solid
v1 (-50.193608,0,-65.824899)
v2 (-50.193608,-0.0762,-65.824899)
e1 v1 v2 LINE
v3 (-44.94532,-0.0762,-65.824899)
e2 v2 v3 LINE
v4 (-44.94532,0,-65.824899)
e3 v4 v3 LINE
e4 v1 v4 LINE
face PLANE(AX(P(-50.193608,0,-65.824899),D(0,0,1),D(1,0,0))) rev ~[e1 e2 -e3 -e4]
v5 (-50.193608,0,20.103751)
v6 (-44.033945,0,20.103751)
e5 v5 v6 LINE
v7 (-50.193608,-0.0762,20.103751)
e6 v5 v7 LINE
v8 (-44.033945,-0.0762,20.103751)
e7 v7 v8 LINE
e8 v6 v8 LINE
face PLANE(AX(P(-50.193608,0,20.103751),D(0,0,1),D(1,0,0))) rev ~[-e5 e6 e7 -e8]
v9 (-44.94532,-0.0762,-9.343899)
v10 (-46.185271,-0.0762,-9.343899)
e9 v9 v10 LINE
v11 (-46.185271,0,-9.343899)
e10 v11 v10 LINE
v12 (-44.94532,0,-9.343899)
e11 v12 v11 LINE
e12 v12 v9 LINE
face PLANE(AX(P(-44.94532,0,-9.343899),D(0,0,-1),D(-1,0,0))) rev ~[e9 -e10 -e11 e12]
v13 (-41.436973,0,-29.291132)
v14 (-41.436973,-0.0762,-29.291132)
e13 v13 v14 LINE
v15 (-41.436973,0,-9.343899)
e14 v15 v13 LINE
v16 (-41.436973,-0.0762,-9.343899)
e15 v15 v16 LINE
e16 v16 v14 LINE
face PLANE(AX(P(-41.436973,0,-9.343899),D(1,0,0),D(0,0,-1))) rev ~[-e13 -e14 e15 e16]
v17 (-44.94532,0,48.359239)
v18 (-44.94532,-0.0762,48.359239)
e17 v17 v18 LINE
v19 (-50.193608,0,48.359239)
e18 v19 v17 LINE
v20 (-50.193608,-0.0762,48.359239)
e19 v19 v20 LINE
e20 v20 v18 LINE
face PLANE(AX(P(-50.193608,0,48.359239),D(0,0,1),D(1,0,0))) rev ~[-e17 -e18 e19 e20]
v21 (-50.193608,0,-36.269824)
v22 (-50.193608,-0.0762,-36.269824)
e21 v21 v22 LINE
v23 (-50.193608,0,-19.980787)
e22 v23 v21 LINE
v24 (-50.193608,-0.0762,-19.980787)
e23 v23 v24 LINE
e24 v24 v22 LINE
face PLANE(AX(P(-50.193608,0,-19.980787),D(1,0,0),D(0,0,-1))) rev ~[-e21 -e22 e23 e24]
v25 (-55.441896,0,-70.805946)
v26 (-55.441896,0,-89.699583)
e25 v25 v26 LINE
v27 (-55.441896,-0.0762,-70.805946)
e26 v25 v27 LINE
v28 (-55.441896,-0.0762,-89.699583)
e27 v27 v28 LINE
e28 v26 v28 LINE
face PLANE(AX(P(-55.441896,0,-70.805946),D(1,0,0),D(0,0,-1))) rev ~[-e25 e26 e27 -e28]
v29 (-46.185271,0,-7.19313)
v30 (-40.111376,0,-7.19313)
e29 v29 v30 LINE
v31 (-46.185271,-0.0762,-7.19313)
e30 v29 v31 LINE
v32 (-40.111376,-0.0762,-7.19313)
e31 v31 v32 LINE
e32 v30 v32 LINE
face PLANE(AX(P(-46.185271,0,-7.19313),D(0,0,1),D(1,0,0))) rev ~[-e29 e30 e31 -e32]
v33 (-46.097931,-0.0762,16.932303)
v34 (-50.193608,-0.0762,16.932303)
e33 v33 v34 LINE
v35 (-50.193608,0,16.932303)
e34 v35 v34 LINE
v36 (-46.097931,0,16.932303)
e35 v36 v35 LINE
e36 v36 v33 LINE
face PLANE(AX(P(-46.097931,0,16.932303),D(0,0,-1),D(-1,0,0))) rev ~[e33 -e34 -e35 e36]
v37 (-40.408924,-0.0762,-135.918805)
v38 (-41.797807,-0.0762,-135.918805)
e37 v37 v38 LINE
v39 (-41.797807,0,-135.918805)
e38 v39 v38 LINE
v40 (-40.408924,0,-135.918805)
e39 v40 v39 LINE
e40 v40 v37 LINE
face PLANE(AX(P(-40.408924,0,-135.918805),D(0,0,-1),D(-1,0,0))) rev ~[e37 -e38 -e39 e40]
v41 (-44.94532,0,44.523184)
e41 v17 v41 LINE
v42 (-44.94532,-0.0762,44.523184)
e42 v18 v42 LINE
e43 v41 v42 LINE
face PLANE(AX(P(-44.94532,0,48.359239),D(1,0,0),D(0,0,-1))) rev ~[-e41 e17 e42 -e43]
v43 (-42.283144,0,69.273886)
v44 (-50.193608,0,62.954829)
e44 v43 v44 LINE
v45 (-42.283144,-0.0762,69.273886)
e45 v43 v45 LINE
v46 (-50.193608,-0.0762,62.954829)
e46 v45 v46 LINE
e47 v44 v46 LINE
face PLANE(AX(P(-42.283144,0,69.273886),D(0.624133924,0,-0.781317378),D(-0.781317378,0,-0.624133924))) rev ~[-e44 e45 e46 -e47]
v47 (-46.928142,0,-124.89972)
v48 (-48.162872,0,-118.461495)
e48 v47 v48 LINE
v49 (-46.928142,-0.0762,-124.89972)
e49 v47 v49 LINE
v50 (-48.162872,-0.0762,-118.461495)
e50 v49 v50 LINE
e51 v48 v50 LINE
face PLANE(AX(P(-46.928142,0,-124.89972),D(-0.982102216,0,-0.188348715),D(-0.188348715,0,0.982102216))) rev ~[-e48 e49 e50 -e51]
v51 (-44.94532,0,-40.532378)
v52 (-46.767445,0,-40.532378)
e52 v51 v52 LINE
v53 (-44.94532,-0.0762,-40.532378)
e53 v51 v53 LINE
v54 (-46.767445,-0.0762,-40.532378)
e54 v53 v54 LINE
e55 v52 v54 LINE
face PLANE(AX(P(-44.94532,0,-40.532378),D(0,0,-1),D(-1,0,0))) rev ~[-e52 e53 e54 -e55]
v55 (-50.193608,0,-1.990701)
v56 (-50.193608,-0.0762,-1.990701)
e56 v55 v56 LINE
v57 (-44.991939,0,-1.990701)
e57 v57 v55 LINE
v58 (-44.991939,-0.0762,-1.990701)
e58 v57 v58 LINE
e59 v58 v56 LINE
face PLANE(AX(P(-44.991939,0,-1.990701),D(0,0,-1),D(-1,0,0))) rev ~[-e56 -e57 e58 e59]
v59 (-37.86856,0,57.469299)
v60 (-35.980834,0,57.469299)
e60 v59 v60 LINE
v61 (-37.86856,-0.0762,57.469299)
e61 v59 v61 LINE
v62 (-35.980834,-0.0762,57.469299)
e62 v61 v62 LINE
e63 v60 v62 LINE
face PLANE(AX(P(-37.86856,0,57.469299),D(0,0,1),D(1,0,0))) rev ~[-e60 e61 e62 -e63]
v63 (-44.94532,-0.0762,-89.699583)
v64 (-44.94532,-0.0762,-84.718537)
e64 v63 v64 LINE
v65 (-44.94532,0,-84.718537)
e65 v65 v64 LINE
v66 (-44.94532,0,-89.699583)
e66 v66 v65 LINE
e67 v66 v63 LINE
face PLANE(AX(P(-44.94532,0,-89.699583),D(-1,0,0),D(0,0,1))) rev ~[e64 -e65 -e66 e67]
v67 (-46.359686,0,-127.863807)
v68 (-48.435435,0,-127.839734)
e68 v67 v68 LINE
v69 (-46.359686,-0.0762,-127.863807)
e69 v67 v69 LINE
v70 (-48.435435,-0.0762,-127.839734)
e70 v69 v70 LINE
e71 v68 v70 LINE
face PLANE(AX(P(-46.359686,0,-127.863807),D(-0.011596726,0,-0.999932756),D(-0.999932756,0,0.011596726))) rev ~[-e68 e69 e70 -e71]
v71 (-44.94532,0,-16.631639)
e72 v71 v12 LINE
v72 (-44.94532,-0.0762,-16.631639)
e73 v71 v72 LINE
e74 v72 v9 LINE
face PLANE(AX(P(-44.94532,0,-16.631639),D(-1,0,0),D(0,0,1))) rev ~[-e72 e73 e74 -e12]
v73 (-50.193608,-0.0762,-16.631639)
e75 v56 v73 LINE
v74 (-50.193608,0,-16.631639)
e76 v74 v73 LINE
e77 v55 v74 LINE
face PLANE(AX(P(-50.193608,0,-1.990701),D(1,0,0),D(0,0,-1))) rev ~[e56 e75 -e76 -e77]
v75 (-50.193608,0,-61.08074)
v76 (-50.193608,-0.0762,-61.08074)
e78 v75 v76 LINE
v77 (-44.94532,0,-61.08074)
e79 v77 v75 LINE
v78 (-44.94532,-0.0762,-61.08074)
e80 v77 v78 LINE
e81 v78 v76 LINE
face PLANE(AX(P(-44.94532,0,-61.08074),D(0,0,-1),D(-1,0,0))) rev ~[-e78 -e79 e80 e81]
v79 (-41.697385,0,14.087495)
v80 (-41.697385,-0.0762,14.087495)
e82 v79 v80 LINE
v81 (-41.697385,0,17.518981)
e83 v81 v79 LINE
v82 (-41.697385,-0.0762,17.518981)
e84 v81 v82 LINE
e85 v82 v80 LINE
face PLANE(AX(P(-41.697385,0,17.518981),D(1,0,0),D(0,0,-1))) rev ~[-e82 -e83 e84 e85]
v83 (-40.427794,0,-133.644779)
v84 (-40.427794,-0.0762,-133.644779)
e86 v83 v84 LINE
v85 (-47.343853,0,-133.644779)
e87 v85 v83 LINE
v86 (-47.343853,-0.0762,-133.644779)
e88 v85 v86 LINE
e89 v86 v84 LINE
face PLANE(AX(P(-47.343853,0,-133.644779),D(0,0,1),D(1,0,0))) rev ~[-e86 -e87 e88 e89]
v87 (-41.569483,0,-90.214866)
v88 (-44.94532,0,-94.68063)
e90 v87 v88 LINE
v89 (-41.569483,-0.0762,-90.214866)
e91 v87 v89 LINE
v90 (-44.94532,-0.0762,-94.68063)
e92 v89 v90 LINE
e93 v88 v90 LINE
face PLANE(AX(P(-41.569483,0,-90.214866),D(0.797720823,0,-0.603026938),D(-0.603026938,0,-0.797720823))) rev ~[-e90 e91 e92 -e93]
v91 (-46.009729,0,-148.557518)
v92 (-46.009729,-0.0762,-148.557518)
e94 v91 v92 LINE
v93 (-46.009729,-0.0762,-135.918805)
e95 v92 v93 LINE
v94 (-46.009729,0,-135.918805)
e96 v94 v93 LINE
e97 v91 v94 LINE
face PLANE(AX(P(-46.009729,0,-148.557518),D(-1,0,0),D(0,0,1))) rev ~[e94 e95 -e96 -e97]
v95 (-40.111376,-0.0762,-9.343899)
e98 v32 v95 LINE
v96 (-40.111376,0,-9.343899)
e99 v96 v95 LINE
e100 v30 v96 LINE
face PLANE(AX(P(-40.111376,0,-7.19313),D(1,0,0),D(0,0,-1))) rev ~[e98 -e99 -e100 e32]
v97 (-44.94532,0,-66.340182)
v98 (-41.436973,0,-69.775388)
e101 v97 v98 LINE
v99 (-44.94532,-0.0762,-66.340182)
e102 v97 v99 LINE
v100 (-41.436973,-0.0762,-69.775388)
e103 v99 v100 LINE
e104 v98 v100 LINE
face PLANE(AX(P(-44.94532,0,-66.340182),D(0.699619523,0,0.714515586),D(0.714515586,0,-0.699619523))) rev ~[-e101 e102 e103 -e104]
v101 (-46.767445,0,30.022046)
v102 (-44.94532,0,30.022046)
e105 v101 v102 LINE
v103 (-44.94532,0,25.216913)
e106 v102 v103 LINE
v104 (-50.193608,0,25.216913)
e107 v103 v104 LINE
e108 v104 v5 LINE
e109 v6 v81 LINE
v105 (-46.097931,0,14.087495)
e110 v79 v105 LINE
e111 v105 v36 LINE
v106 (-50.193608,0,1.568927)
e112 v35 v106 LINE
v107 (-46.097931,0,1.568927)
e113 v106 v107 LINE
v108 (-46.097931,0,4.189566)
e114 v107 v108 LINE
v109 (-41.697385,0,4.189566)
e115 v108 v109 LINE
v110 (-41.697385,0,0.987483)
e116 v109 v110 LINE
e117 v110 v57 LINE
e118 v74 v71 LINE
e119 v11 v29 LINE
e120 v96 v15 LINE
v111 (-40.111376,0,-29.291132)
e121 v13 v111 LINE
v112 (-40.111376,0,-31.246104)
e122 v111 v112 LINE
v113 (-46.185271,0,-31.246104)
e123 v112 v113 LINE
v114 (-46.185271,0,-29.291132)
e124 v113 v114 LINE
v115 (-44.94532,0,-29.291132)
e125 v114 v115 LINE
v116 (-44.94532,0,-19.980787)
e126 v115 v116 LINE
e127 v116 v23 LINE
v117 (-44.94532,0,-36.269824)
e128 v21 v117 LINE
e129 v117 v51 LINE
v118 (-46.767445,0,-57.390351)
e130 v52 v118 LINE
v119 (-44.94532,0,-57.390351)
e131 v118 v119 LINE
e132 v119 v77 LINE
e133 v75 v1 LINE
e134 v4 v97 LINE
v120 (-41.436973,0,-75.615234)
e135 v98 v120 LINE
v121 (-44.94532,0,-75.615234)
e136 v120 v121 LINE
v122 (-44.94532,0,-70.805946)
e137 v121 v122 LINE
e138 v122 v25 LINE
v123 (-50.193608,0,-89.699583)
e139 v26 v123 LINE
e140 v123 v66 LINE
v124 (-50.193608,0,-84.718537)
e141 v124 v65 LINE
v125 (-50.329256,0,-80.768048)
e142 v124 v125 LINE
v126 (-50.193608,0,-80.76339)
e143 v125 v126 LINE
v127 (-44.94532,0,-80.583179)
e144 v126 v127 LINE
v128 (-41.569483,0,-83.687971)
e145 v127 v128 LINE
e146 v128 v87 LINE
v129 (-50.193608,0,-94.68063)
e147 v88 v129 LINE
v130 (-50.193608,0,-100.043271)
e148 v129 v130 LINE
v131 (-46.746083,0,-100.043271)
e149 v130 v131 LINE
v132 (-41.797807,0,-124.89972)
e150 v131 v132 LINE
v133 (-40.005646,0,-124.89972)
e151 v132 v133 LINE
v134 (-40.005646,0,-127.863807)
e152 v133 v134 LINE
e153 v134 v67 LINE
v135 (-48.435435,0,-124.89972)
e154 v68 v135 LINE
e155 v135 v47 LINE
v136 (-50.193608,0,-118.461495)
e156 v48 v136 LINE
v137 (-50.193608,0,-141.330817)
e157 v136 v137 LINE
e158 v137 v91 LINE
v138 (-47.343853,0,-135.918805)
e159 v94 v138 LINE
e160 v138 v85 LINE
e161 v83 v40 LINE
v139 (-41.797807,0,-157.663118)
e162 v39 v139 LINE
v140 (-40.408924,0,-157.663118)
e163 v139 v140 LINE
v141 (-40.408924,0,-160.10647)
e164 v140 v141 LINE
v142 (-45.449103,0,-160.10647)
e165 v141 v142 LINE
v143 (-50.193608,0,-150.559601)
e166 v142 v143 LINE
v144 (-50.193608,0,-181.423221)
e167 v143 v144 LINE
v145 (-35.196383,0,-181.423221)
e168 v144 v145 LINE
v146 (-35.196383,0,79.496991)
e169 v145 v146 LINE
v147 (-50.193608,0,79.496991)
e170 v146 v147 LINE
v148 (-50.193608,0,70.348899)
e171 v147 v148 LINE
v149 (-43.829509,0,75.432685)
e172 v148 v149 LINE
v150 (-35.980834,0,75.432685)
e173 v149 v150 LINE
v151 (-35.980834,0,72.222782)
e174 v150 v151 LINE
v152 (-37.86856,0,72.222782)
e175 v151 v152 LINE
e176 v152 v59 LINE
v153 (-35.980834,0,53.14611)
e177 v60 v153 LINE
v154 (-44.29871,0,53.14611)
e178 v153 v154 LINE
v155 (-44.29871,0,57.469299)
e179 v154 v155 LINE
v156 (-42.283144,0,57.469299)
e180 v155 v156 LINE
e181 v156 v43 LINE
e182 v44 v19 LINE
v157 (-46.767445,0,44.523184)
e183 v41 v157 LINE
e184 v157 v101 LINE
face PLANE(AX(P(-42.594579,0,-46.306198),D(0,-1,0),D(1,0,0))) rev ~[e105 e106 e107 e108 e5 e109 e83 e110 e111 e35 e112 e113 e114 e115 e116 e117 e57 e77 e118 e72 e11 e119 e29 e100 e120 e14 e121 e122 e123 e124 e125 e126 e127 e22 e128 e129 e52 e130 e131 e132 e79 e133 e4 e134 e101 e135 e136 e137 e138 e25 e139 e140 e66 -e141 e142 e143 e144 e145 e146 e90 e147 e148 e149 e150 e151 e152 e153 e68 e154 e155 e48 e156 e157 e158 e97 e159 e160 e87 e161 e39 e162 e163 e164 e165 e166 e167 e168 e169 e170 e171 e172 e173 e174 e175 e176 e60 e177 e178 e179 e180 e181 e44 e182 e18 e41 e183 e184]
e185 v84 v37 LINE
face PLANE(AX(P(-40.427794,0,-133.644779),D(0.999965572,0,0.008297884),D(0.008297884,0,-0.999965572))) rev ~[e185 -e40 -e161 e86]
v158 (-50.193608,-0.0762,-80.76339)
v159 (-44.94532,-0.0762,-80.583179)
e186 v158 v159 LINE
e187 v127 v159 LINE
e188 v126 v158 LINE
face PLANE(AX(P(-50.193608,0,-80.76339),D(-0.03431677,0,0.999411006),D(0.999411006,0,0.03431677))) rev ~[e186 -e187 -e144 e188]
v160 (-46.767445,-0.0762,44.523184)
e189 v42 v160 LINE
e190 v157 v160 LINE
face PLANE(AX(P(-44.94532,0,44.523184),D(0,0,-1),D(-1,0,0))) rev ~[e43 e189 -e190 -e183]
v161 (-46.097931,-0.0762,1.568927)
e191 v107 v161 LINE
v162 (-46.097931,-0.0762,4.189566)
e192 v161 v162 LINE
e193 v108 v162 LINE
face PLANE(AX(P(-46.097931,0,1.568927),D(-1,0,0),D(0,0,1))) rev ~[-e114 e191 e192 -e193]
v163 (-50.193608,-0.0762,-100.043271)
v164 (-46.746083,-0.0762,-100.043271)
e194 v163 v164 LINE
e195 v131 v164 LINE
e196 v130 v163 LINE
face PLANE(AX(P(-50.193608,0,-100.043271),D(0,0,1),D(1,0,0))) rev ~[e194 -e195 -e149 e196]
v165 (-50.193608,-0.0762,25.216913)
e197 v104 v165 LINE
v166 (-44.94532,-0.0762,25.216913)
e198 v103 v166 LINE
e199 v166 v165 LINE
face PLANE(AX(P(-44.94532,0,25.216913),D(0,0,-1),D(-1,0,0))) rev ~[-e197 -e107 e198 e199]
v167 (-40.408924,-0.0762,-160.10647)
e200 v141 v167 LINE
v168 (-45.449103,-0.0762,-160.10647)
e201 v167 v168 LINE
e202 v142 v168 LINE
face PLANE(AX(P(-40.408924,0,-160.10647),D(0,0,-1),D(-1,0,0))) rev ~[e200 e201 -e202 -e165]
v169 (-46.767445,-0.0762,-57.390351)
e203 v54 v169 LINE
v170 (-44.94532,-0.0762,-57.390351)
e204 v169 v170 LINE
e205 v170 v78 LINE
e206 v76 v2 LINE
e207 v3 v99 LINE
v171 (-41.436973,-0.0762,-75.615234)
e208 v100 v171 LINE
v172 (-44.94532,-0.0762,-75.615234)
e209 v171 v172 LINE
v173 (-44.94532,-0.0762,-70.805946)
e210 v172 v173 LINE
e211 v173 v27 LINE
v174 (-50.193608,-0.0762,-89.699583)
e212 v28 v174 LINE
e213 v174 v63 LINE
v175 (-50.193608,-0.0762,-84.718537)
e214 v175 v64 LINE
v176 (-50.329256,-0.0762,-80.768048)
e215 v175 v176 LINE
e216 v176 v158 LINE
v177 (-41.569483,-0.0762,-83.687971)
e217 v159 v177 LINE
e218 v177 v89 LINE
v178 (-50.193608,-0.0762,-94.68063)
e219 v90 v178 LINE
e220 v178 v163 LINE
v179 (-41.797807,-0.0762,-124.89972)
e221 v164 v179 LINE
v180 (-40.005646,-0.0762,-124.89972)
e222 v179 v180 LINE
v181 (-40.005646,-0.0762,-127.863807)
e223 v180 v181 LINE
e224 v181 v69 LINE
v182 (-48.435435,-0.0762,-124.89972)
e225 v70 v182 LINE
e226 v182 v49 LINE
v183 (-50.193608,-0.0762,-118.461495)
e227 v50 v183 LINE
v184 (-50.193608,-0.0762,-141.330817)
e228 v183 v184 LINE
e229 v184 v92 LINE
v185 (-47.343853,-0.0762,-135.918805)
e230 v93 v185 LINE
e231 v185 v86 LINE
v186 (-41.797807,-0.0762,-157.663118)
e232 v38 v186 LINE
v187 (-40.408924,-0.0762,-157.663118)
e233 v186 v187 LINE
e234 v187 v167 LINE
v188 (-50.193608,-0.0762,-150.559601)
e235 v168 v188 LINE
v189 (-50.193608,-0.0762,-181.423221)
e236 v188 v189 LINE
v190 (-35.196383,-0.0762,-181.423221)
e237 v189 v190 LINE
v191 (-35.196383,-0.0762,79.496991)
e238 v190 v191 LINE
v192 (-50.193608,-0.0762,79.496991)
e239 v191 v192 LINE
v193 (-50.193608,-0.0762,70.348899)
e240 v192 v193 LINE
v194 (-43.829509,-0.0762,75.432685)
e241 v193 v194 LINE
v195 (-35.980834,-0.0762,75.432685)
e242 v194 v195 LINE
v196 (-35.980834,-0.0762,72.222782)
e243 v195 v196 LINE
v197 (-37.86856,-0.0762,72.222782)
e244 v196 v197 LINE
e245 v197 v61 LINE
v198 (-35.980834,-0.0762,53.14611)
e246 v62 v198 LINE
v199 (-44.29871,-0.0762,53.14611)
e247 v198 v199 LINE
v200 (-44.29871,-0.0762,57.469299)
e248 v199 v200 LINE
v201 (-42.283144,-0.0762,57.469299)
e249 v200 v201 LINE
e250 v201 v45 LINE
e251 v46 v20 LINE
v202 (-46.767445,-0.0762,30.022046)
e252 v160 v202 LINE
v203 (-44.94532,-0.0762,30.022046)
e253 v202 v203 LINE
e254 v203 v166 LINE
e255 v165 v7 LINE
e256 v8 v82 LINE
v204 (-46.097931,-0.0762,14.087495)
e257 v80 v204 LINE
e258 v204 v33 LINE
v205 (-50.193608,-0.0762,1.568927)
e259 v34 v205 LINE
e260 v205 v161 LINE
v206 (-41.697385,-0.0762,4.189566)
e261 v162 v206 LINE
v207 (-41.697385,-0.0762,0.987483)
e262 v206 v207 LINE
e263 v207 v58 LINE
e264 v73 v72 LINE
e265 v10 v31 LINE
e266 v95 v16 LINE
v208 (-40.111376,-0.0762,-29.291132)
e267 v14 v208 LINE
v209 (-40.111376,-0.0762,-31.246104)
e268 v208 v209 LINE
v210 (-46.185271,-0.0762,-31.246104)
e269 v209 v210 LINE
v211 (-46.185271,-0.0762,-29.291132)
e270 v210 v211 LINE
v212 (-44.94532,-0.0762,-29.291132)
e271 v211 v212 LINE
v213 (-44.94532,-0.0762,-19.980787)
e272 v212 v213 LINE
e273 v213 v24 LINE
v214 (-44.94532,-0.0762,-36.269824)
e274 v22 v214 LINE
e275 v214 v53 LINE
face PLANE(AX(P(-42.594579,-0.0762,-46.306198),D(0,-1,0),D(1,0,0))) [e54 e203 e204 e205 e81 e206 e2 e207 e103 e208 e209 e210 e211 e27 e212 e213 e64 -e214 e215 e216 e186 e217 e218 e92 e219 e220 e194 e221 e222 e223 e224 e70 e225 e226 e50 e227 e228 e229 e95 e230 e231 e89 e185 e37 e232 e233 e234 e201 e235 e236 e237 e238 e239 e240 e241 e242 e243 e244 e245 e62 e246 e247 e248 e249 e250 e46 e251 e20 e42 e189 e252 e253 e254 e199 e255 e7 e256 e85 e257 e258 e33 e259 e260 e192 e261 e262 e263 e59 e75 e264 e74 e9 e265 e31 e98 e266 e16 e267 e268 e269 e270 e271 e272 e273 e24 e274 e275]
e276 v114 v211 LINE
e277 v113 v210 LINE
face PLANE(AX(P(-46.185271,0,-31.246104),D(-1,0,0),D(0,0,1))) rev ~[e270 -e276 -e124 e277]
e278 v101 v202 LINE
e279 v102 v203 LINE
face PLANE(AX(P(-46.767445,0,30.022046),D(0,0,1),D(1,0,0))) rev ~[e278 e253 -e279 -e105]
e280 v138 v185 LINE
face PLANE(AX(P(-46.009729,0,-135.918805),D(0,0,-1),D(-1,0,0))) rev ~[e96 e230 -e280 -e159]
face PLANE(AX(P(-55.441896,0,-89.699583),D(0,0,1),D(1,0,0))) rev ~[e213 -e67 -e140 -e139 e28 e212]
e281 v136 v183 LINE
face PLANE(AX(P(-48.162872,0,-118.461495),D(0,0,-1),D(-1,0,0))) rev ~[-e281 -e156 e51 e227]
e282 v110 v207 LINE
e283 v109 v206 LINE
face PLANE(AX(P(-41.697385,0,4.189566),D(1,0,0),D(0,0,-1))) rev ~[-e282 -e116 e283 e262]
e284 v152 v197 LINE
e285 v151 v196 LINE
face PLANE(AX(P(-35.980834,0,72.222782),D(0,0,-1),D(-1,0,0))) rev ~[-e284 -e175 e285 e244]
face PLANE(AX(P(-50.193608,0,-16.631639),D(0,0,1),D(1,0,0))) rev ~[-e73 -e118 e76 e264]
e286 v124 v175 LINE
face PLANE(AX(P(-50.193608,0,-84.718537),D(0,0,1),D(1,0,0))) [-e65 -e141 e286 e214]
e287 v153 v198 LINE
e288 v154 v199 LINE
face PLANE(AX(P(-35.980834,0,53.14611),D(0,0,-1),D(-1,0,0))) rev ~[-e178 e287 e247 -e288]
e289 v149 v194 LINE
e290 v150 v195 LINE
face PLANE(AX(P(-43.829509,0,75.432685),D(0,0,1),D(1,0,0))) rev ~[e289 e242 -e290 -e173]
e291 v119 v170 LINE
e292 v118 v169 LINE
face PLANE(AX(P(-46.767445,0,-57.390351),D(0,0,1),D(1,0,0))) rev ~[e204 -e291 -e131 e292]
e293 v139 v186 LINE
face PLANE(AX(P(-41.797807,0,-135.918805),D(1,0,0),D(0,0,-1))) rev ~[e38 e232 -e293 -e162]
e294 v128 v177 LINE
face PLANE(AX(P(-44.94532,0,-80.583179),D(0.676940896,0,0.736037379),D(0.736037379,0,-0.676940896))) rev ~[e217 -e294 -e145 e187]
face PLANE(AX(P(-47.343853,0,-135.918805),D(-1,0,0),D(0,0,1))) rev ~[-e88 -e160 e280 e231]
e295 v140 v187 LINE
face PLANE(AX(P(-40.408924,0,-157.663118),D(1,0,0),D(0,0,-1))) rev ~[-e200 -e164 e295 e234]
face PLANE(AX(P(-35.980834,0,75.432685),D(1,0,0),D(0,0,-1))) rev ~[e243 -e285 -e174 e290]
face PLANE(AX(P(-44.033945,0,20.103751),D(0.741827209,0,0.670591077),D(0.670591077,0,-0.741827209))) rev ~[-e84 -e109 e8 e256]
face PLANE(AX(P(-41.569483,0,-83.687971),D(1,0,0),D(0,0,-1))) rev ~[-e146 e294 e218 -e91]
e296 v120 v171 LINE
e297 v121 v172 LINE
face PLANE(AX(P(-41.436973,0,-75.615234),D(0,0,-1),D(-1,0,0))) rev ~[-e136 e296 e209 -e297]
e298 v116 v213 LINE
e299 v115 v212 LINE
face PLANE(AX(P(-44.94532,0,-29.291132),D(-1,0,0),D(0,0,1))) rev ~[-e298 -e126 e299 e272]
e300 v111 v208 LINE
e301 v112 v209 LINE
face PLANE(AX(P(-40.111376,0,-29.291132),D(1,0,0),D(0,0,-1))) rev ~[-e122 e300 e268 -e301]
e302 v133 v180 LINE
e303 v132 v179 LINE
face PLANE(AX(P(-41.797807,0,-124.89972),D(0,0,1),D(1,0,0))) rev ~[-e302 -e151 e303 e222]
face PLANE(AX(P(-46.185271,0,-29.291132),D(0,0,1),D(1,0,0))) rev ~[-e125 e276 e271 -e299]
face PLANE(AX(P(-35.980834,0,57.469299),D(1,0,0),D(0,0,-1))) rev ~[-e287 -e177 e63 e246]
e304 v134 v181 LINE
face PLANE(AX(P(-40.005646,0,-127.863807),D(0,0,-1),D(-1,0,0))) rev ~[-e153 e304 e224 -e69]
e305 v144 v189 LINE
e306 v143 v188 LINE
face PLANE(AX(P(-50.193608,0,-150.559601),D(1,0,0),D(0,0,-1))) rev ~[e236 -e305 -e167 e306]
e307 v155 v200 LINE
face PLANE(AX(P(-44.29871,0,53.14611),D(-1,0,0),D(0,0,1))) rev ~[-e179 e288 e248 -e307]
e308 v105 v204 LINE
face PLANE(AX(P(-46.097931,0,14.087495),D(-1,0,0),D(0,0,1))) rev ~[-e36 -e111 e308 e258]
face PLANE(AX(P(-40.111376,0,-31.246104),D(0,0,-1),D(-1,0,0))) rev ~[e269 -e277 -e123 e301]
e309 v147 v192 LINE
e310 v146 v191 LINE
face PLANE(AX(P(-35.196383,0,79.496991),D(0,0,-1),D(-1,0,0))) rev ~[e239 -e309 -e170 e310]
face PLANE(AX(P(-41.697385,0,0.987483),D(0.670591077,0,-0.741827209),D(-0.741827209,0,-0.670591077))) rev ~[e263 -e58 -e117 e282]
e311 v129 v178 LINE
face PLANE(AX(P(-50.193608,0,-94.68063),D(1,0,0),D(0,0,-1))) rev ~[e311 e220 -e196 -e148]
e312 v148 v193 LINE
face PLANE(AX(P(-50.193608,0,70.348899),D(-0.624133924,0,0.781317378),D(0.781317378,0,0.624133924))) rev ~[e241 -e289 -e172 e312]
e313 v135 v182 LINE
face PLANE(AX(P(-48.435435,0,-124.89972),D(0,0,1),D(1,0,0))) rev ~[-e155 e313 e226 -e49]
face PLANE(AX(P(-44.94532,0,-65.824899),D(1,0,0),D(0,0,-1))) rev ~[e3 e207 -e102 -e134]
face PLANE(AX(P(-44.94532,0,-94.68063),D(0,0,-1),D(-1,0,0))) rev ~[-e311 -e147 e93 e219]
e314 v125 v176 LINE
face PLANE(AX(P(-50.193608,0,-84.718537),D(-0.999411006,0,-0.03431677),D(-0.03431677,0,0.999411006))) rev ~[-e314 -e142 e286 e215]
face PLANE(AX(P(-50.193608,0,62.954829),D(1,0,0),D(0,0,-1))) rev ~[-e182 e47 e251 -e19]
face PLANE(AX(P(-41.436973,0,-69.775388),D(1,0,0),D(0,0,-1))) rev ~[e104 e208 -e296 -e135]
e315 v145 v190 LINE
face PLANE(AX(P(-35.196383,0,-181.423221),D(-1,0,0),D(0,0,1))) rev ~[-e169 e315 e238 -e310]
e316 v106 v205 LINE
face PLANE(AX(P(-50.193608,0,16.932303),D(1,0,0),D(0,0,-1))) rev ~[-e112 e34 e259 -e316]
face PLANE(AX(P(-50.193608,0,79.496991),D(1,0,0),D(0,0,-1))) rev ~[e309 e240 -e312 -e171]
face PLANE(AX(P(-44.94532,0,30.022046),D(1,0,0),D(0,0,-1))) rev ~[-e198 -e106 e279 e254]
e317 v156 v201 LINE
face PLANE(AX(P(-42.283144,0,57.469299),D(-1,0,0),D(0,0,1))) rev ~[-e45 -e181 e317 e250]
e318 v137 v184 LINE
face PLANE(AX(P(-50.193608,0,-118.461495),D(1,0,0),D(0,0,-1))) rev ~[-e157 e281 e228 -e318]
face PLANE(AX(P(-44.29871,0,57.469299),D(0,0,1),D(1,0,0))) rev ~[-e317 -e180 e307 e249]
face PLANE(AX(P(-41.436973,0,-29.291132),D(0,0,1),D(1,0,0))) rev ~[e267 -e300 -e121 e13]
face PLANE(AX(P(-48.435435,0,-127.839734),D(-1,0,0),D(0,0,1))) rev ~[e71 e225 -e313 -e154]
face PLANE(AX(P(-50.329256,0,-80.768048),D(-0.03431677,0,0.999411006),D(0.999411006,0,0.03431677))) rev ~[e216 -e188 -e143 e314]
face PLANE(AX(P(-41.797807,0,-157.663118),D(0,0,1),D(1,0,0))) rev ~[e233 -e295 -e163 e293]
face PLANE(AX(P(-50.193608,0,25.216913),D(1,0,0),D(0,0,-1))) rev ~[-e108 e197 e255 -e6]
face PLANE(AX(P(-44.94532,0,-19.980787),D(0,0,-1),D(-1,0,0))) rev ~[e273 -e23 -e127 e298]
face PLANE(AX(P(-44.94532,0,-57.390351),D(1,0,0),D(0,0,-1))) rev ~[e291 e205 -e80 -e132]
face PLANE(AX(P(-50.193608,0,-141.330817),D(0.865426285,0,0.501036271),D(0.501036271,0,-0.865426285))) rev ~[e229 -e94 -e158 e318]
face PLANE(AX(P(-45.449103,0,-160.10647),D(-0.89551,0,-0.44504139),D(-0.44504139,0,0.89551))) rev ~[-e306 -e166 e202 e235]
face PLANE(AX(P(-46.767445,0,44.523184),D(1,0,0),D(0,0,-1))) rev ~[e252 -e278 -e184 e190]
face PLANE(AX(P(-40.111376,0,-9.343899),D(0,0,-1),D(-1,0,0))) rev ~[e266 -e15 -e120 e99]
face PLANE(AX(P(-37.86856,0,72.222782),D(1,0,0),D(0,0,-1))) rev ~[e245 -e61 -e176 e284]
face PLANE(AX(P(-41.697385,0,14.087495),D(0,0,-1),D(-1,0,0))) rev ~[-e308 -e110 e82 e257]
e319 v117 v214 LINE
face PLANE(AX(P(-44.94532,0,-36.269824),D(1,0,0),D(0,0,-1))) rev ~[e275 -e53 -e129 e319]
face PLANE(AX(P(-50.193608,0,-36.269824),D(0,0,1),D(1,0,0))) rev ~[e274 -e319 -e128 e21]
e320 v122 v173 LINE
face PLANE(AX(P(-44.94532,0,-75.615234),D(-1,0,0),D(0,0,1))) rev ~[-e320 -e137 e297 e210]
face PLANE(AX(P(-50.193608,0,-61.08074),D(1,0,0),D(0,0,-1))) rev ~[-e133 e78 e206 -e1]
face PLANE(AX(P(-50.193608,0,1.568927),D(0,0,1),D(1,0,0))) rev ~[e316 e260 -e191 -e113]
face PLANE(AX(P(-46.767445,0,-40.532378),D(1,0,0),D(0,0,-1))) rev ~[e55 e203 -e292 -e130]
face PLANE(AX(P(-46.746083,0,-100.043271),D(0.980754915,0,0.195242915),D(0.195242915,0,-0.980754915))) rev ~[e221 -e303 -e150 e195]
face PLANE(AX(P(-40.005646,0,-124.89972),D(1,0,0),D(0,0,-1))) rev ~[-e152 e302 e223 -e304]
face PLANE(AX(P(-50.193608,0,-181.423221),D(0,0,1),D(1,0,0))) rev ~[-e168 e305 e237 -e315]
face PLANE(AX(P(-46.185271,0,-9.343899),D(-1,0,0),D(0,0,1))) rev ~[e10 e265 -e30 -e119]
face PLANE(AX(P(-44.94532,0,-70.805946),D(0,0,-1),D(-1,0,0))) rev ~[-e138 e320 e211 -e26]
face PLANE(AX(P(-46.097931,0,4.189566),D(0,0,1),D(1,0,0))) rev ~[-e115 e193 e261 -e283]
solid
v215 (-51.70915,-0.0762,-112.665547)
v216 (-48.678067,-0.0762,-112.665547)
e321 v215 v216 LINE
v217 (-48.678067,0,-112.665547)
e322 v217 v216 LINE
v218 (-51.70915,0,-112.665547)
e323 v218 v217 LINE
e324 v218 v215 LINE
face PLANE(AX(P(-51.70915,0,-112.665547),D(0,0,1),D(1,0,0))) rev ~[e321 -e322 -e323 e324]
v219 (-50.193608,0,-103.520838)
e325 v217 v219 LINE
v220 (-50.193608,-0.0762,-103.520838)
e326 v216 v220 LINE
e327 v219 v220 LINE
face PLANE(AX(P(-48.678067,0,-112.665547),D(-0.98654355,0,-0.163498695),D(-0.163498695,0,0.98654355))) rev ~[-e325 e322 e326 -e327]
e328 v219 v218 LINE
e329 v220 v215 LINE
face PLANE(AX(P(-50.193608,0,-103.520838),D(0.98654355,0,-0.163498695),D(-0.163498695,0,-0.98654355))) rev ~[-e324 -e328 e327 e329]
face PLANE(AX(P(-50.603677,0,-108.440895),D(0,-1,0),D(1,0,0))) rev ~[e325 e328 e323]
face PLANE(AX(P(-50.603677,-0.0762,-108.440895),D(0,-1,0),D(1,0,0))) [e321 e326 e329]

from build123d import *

# Parameters (mm, degrees)
F0_W     = 5.2482880054
F0_H     = 4.9810466543
F1_DEPTH = 0.0762


# Not quite as in the source:
# - a feature names something its author has since deleted; it is built from what else it names


with BuildPart() as f1:
    # F0 (on Front) → F1 (new body)
    with BuildSketch(Plane.XZ):
        Polygon((-35.1963832856, 79.4969911185), (-50.193608411, 79.4969911185), (-50.193608411, 70.3488993556), (-43.8295094164, 75.4326850121), (-35.9808335364, 75.4326850121), (-35.9808335364, 72.2227817215), (-37.8685602848, 72.2227817215), (-37.8685602848, 57.4692988183), (-35.9808335364, 57.4692988183), (-35.9808335364, 53.1461095161), (-44.2987100306, 53.1461095161), (-44.2987100306, 57.4692988183), (-42.2831444735, 57.4692988183), (-42.2831444735, 69.2738860086), (-50.193608411, 62.954829197), (-50.193608411, 48.3592389848), (-44.9453204056, 48.3592389848), (-44.9453204056, 44.5231835829), (-46.7674447154, 44.5231835829), (-46.7674447154, 30.0220460158), (-44.9453204056, 30.0220460158), (-44.9453204056, 25.2169134009), (-50.193608411, 25.2169134009), (-50.193608411, 20.1037506657), (-44.0339450055, 20.1037506657), (-41.6973850482, 17.5189805853), (-41.6973850482, 14.0874953759), (-46.0979307142, 14.0874953759), (-46.0979307142, 16.9323027027), (-50.193608411, 16.9323027027), (-50.193608411, 1.5689273412), (-46.0979307142, 1.5689273412), (-46.0979307142, 4.1895659023), (-41.6973850482, 4.1895659023), (-41.6973850482, 0.9874830587), (-44.9919385552, -1.9907012912), (-50.193608411, -1.9907012912), (-50.193608411, -16.6316394584), (-44.9453204056, -16.6316394584), (-44.9453204056, -9.343899268), (-46.1852711141, -9.343899268), (-46.1852711141, -7.1931303074), (-44.9453204056, -7.1931303074), (-41.4369731104, -7.1931303074), (-40.111375595, -7.1931303074), (-40.111375595, -9.343899268), (-41.4369731104, -9.343899268), (-41.4369731104, -29.2911320519), (-40.111375595, -29.2911320519), (-40.111375595, -31.2461041507), (-41.4369731104, -31.2461041507), (-44.9453204056, -31.2461041507), (-46.1852711141, -31.2461041507), (-46.1852711141, -29.2911320519), (-44.9453204056, -29.2911320519), (-44.9453204056, -19.9807869131), (-50.193608411, -19.9807869131), (-50.193608411, -36.2698242769), (-44.9453204056, -36.2698242769), (-44.9453204056, -40.5323778866), (-46.7674447154, -40.5323778866), (-46.7674447154, -57.3903505305), (-44.9453204056, -57.3903505305), (-44.9453204056, -61.0807400528), (-50.193608411, -61.0807400528), (-50.193608411, -65.8248991014), (-44.9453204056, -65.8248991014), (-44.9453204056, -66.3401821199), (-41.4369731104, -69.7753881654), (-41.4369731104, -75.6152342194), (-44.9453204056, -75.6152342194), (-44.9453204056, -70.8059457557), (-50.193608411, -70.8059457557), (-50.193608411, -73.4616260623), (-50.193608411, -80.7633897693), (-44.9453204056, -80.5831793362), (-41.5694830255, -83.6879705381), (-41.5694830255, -90.214866248), (-44.9453204056, -94.6806298838), (-50.193608411, -94.6806298838), (-50.193608411, -100.0432713063), (-46.7460826389, -100.0432713063), (-41.7978071284, -124.8997201194), (-40.0056464088, -124.8997201194), (-40.0056464088, -127.8638071794), (-41.2077341248, -127.8638071794), (-46.3596858381, -127.8638071794), (-48.4354351813, -127.8397336649), (-48.4354351813, -124.8997201194), (-46.9281419303, -124.8997201194), (-48.1628723165, -118.4614948803), (-50.193608411, -118.4614948803), (-50.193608411, -141.3308172114), (-46.009728736, -148.5575184684), (-46.009728736, -135.918805119), (-47.3438533436, -135.918805119), (-47.3438533436, -135.2590725668), (-47.3438533436, -133.6447787085), (-46.009728736, -133.6447787085), (-41.7978071284, -133.6447787085), (-40.4277944904, -133.6447787085), (-40.4089242338, -135.918805119), (-41.7978071284, -135.918805119), (-41.7978071284, -157.6631183666), (-40.4089242338, -157.6631183666), (-40.4089242338, -160.1064702757), (-41.7978071284, -160.1064702757), (-45.4491030418, -160.1064702757), (-50.193608411, -150.5596009381), (-50.193608411, -181.4232210127), (-35.1963832856, -181.4232210127), (-35.1963832856, -73.4616260623), (-35.1963832856, 72.2227817215), (-35.1963832856, 75.4326850121), align=None)
        with Locations((-47.5694644083, -87.2090599023)):
            Rectangle(F0_W, F0_H)
        Polygon((-55.4418964164, -89.6995832295), (-50.193608411, -89.6995832295), (-50.193608411, -84.7185365752), (-50.3292563299, -80.7680475111), (-50.193608411, -80.7633897693), (-50.193608411, -73.4616260623), (-50.193608411, -70.8059457557), (-55.4418964164, -70.8059457557), align=None)
    extrude(amount=F1_DEPTH)


with BuildPart() as f1b:
    # F0 (on Front) → F1, piece 2 (new body)
    with BuildSketch(Plane.XZ):
        Polygon((-51.709150179, -112.6655470911), (-50.193608411, -112.6655470911), (-50.193608411, -103.5208382904), align=None)
        Polygon((-50.193608411, -103.5208382904), (-50.193608411, -112.6655470911), (-48.6780666431, -112.6655470911), align=None)
    extrude(amount=F1_DEPTH)


solid = Compound([f1.part, f1b.part])
